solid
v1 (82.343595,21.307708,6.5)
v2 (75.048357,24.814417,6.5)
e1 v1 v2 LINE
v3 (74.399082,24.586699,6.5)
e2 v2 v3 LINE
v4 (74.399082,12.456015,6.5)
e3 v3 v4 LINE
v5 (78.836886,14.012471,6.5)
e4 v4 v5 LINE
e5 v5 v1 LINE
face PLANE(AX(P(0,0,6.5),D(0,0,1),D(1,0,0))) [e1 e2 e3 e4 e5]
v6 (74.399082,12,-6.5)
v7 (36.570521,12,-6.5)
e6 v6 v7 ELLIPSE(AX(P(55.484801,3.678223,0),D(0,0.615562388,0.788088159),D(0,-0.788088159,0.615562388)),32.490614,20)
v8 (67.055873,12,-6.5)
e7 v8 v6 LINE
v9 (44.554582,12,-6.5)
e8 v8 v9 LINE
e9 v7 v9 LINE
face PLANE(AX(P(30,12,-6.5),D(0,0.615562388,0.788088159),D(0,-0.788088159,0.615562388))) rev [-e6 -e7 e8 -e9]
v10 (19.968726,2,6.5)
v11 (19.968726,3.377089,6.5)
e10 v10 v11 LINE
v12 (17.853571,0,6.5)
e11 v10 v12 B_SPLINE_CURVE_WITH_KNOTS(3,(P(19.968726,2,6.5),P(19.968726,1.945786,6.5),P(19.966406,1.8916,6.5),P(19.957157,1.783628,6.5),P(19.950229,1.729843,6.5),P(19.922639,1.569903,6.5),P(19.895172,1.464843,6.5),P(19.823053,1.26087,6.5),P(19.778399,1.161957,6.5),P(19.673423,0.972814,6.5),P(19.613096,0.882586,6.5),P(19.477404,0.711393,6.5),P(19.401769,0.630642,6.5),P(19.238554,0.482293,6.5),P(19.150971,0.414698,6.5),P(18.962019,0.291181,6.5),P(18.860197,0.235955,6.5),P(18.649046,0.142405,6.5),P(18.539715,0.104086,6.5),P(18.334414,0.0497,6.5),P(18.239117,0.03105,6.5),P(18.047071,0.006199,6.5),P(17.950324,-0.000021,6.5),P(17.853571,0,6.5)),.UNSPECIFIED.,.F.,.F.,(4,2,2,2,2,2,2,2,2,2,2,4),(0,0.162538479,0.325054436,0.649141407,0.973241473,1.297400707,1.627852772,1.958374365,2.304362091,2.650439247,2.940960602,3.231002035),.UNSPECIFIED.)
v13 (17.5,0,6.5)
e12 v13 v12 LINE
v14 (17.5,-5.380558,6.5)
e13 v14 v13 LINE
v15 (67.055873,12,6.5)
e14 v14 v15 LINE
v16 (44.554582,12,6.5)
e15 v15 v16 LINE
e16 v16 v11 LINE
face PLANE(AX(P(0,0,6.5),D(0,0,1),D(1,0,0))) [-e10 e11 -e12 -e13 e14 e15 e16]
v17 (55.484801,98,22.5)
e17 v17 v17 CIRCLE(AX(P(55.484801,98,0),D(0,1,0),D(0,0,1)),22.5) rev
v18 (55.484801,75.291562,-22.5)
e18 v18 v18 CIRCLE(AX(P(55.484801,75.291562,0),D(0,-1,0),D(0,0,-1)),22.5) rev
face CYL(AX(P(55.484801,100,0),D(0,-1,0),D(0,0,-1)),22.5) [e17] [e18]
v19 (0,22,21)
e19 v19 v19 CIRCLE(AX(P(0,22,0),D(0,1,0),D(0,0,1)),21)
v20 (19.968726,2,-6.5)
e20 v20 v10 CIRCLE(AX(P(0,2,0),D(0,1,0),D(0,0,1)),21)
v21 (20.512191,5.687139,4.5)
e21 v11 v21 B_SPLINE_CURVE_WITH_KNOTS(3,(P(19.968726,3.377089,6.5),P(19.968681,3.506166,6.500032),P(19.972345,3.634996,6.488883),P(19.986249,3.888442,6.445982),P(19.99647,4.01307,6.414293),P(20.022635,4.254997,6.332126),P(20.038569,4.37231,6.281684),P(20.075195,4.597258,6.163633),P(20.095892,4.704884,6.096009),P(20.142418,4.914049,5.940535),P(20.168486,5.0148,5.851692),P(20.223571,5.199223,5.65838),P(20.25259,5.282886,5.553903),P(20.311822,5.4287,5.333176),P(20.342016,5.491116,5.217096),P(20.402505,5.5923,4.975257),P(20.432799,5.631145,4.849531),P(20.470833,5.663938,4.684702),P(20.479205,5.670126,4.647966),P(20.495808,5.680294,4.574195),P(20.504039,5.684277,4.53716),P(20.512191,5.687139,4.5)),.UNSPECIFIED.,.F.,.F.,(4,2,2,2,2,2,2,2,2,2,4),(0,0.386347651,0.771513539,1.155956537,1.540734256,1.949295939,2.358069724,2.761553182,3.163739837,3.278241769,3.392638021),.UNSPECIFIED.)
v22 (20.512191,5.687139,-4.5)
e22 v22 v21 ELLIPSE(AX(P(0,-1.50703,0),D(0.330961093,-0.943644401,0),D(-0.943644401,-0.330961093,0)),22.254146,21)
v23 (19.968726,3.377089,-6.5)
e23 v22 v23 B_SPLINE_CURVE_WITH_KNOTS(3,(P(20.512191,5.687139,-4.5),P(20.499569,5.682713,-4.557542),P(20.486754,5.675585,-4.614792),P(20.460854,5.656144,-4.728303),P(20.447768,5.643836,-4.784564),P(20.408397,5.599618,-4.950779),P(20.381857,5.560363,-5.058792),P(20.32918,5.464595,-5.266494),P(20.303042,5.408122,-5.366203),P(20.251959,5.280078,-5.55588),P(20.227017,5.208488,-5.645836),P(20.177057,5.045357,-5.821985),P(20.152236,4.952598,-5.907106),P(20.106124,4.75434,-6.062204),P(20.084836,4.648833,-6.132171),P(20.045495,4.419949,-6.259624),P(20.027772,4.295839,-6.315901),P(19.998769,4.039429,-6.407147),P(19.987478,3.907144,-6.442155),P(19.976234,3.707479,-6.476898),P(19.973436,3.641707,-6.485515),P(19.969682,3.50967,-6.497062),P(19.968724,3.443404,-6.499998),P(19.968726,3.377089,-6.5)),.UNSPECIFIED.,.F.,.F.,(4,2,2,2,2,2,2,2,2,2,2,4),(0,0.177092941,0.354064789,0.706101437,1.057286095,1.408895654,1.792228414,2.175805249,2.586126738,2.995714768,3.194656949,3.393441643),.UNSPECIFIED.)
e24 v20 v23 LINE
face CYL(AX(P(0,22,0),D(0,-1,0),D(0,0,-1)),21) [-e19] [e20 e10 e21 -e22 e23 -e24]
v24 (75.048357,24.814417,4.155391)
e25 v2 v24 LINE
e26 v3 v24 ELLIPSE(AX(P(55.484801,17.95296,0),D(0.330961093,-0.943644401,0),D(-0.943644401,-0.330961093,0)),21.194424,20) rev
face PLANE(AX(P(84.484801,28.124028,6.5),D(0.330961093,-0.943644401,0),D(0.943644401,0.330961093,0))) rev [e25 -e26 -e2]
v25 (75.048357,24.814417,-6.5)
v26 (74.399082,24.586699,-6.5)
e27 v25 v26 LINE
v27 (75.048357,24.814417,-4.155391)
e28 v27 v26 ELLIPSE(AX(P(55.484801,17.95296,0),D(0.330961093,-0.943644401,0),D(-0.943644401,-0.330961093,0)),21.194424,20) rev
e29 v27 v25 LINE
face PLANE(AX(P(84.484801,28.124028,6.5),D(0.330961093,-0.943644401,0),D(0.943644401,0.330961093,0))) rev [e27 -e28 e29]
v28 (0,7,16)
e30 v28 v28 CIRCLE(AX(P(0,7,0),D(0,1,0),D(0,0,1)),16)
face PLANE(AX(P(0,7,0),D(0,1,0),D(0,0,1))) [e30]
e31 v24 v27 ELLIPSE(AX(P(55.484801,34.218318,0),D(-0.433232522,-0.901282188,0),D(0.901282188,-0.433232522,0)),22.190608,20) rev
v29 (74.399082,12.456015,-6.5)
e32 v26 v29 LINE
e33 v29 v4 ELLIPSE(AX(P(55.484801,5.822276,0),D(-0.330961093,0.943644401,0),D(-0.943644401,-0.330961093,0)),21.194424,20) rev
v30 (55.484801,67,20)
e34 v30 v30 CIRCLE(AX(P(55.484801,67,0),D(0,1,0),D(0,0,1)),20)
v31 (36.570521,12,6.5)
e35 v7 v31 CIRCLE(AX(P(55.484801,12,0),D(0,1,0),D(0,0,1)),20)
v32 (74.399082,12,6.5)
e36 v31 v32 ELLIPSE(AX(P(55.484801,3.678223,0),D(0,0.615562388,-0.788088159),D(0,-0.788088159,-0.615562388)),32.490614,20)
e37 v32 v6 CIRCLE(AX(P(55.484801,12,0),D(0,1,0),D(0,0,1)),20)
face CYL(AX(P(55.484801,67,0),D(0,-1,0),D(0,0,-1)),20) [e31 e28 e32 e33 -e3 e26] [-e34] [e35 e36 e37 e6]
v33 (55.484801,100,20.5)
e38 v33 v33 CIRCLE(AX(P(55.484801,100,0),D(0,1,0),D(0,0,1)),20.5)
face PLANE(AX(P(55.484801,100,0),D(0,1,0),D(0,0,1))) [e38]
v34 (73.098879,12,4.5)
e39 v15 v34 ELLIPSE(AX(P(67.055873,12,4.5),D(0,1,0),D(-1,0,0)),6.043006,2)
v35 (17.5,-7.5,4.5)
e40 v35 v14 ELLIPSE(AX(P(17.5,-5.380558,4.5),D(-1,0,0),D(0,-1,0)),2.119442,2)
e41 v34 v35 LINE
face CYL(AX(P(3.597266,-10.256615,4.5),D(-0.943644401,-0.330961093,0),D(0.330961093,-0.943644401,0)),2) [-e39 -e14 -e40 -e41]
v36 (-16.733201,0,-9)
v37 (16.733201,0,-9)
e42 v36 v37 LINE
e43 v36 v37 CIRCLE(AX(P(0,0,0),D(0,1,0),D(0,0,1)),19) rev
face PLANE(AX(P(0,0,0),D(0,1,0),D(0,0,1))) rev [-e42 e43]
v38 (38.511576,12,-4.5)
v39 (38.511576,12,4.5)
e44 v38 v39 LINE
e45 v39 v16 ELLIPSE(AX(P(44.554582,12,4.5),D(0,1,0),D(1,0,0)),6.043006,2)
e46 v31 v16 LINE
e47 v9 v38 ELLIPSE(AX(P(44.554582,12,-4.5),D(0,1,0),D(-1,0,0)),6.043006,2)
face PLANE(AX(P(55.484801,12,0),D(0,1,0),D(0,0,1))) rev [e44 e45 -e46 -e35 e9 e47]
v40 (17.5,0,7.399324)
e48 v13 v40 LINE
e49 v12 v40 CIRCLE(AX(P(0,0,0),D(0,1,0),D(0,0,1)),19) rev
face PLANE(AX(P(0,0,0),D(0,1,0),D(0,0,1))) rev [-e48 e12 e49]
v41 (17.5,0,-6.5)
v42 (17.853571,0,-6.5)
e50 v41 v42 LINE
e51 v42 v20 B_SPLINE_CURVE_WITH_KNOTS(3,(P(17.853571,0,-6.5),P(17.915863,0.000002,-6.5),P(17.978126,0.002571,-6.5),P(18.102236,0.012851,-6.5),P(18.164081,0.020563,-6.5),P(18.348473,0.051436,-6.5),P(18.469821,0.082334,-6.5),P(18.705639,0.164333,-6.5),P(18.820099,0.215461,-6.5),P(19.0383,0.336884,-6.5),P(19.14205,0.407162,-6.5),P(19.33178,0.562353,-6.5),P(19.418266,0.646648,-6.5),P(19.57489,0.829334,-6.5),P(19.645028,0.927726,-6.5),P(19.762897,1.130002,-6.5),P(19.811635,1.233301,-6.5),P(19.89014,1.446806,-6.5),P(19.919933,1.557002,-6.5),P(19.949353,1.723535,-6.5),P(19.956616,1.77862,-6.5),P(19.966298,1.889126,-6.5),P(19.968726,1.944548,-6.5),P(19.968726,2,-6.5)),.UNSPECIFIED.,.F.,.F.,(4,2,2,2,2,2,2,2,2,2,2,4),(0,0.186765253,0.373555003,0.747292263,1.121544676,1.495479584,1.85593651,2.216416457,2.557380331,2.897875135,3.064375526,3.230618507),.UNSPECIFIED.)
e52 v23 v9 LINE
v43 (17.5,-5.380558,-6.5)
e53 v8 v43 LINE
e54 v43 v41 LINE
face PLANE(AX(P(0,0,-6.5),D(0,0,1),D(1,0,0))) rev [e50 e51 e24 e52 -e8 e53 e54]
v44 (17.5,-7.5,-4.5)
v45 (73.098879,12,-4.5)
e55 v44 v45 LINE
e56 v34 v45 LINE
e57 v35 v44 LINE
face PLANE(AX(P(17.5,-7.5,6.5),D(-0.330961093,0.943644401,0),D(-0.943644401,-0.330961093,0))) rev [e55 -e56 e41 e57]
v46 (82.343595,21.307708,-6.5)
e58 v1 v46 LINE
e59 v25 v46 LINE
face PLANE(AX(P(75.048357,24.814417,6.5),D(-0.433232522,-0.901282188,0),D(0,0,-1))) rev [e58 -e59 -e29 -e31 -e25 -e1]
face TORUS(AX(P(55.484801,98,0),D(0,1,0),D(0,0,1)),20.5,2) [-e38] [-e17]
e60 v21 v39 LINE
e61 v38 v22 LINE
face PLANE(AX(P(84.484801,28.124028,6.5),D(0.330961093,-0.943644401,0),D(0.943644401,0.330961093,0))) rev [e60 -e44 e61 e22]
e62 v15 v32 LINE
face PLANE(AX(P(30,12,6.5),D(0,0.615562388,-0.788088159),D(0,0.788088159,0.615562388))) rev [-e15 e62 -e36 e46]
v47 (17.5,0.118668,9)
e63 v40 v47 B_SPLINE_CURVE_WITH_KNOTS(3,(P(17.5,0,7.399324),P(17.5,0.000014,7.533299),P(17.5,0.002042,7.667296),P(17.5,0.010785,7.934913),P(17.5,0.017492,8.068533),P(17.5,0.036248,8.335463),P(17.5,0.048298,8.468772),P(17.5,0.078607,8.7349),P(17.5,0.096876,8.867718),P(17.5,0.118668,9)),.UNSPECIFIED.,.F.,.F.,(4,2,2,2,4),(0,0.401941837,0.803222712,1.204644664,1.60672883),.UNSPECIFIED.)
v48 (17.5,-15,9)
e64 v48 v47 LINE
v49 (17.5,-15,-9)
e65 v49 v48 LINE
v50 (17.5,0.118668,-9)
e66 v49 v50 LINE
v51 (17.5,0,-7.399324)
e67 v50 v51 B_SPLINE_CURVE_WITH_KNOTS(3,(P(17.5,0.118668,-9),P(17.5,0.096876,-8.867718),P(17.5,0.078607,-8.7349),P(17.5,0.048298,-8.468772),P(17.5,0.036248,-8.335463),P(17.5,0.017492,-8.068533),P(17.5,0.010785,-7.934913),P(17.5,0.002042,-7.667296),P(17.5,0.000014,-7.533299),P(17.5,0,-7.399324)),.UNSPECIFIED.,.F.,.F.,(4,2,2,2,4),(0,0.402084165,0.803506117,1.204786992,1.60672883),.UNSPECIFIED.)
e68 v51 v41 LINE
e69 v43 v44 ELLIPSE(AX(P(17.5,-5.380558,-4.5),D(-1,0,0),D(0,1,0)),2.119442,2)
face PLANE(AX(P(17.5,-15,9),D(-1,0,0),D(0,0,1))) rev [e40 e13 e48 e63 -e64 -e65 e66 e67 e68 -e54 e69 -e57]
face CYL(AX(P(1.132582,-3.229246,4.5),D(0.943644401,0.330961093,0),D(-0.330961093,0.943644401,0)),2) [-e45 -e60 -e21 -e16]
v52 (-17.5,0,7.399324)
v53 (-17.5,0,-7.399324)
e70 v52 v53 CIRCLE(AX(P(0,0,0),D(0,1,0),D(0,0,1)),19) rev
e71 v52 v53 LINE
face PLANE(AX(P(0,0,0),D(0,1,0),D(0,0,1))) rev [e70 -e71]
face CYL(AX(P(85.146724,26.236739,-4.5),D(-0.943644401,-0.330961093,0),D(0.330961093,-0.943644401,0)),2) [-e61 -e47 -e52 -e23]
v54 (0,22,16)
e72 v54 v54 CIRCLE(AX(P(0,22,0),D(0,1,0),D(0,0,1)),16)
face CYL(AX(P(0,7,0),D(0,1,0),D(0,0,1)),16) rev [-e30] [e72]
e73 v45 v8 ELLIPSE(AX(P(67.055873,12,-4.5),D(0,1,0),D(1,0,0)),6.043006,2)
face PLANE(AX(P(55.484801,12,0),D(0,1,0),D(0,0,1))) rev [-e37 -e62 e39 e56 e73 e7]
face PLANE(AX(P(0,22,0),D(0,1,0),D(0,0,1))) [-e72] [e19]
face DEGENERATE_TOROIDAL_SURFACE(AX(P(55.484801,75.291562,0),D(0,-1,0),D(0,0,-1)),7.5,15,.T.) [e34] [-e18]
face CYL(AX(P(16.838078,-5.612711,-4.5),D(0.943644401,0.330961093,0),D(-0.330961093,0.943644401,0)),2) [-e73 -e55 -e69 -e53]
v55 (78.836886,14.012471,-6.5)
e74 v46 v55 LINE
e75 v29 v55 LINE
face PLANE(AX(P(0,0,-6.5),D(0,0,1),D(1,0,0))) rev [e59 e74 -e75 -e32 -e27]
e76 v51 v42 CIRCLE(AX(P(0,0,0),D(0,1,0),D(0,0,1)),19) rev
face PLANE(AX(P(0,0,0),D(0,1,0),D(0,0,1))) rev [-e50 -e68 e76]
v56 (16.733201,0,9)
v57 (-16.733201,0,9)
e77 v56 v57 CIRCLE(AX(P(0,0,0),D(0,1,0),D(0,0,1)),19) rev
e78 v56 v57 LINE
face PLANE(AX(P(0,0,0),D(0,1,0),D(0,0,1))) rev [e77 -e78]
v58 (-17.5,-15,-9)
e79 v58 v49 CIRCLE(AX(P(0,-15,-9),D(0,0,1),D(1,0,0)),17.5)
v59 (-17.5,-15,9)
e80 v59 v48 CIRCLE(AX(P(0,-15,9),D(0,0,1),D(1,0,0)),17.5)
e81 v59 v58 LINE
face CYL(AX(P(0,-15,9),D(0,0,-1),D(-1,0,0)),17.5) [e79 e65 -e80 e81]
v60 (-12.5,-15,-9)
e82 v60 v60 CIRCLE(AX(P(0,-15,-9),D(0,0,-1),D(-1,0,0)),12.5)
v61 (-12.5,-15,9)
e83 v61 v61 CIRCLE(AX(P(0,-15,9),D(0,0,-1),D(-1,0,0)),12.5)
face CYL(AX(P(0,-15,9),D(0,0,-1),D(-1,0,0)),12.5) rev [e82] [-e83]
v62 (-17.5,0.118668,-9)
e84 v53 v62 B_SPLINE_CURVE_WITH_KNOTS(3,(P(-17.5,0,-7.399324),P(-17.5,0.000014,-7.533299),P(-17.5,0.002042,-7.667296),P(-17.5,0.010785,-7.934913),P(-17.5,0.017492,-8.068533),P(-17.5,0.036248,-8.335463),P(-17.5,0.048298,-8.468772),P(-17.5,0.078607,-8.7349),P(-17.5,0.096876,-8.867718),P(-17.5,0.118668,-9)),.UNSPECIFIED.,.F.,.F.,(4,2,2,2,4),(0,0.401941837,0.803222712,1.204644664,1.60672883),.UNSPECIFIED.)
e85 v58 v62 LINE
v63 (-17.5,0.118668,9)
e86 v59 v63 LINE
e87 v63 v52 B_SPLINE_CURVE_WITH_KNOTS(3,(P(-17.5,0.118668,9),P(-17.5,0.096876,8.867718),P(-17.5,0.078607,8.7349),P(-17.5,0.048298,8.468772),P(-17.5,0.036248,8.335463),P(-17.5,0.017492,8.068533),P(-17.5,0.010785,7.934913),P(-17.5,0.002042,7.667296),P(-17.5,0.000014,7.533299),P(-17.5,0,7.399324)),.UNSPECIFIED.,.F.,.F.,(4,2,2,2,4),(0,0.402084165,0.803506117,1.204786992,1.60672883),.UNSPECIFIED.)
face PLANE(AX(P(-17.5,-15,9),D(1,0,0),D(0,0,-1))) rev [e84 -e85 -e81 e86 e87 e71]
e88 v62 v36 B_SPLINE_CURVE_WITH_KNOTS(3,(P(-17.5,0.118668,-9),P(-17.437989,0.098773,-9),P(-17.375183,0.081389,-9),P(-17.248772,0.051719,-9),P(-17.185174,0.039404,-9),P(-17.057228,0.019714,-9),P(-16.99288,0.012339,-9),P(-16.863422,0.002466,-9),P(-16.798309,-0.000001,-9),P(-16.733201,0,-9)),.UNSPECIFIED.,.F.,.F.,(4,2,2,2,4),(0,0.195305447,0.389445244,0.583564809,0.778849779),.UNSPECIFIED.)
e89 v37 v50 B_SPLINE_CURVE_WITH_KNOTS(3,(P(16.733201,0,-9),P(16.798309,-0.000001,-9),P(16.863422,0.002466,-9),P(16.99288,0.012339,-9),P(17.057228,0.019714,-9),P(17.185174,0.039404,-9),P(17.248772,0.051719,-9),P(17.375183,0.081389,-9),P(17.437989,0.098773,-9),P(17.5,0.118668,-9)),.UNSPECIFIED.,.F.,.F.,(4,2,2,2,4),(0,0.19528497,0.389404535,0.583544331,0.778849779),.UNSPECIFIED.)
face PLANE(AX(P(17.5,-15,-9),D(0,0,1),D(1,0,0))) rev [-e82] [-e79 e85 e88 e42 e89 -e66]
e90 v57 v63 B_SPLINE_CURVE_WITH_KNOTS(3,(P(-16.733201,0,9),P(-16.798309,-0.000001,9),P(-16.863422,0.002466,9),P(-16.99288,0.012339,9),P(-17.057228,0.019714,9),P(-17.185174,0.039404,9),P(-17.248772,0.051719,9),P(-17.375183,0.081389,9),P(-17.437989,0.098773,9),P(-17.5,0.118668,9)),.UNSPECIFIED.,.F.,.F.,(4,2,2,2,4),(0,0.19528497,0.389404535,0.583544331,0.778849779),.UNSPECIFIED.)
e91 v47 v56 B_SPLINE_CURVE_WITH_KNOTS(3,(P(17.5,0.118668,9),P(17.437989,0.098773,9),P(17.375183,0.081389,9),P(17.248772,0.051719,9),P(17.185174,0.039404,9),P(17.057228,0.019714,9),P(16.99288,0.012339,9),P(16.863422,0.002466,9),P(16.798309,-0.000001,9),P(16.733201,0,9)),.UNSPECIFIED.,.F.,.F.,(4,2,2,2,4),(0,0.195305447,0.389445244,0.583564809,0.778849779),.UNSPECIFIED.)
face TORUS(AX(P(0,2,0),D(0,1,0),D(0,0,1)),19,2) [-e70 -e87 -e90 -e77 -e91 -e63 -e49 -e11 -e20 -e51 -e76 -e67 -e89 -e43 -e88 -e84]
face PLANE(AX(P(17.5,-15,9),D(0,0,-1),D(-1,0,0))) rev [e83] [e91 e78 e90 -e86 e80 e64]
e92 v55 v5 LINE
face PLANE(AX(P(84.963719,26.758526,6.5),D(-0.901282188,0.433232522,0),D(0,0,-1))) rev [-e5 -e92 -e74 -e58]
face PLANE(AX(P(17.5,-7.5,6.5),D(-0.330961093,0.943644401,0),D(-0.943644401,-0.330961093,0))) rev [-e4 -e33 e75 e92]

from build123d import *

# Parameters (mm, degrees)
SKETCH1_R           = 21
BOSS_EXTRUDE1_DEPTH = 22
SKETCH3_W           = 35
SKETCH3_H           = 18
BOSS_EXTRUDE2_DEPTH = 15
BOSS_EXTRUDE3_DEPTH = 9
SKETCH6_R           = 12.5
CUT_EXTRUDE1_DEPTH  = 18
BOSS_EXTRUDE5_DEPTH = 6.5
SKETCH9_R           = 20
BOSS_EXTRUDE6_DEPTH = 55
SKETCH10_R          = 22.5
BOSS_EXTRUDE7_DEPTH = 33
FILLET1_R           = 15
CHAMFER2_SIZE       = 10
FILLET3_R           = 2
FILLET4_R           = 2
FILLET5_R           = 2
CUT_EXTRUDE4_DEPTH  = 25
SKETCH13_R          = 16
CUT_EXTRUDE6_DEPTH  = 15


with BuildPart() as part:
    # Sketch1 → Boss-Extrude1 (new body)
    with BuildSketch(Plane(origin=(0, 0, 0), x_dir=(1, 0, 0), z_dir=(0, 1, 0))):
        with Locations(Location((0, 0, 0), (0, 0, 270))):
            Circle(SKETCH1_R)
    extrude(amount=BOSS_EXTRUDE1_DEPTH)

    # Sketch3 → Boss-Extrude2 (add)
    with BuildSketch(Plane.XZ):
        Rectangle(SKETCH3_W, SKETCH3_H)
    extrude(amount=BOSS_EXTRUDE2_DEPTH)

    # Sketch5 → Boss-Extrude3 (add, symmetric)
    with BuildSketch(Plane.XY):
        with BuildLine():
            Line((-17.5, -15), (17.5, -15))
            ThreePointArc((17.5, -15), (0, -32.5), (-17.5, -15))
        make_face()
    extrude(amount=BOSS_EXTRUDE3_DEPTH, both=True)

    # Sketch6 → Cut-Extrude1 (cut)
    with BuildSketch(Plane(origin=(0, 0, -9), x_dir=(-1, 0, 0), z_dir=(0, 0, -1))):
        with Locations((0, -15)):
            Circle(SKETCH6_R)
    extrude(amount=-CUT_EXTRUDE1_DEPTH, mode=Mode.SUBTRACT)

    # Sketch7 → Boss-Extrude5 (add, symmetric)
    with BuildSketch(Plane.XY):
        Polygon((17.5, -7.5), (88.273330058, 17.322081953), (84.484801337, 28.124028145), (17.5, 4.63068359), align=None)
    extrude(amount=BOSS_EXTRUDE5_DEPTH, both=True)

    # Sketch9 → Boss-Extrude6 (add)
    with BuildSketch(Plane(origin=(0, 12, 0), x_dir=(1, 0, 0), z_dir=(0, 1, 0))):
        with Locations(Location((55.484801337, 0, 0), (0, 0, 270))):
            Circle(SKETCH9_R)
    extrude(amount=BOSS_EXTRUDE6_DEPTH)

    # Sketch10 → Boss-Extrude7 (add)
    with BuildSketch(Plane(origin=(0, 67, 0), x_dir=(1, 0, 0), z_dir=(0, 1, 0))):
        with Locations(Location((55.484801337, 0, 0), (0, 0, 270))):
            Circle(SKETCH10_R)
    extrude(amount=BOSS_EXTRUDE7_DEPTH)

    # Fillet1
    # the kernel refuses this fillet: 15 mm, written as the material it takes off along each edge
    with BuildSketch(Plane(origin=(55.484801337, 67, 0), x_dir=(0, 0, 1), z_dir=(-1, 0, 0))) as fillet1_piece_1:
        with BuildLine():
            CenterArc((7.5, 8.291561976), FILLET1_R, 326.442690238, 33.557309762)
            Line((20, 0), (20.25, -0.16583124))
            ThreePointArc((20.25, -0.16583124), (21.25, -0.3), (22.5, -0.3))
            Line((22.5, -0.3), (22.8, 0))
            Line((22.8, 0), (22.8, 8.291561976))
            Line((22.8, 8.291561976), (22.5, 8.291561976))
        make_face()
    revolve(axis=Axis((55.484801337, 67, 0), (0, 1, 0)), mode=Mode.SUBTRACT)

    # Chamfer2
    # the kernel refuses this chamfer: 10 mm, written as the material it takes off along each edge
    with BuildSketch(Plane(origin=(84.484801337, 28.124028145, -32.21682988), x_dir=(-0.9523876901556013, -0.30488963189993584, 0), z_dir=(0, 0, 1))) as chamfer2_piece_1_section:
        Polygon((CHAMFER2_SIZE * 0.999621916911, CHAMFER2_SIZE * 0.0274958766106), (-CHAMFER2_SIZE * 0.0274958766106, CHAMFER2_SIZE * 0.999621916911), (0, 0), align=None)
    chamfer2_piece_1 = extrude(amount=64.433659759, mode=Mode.PRIVATE)
    chamfer2_piece_1 = chamfer2_piece_1 - Plane(origin=(55.484801337, 23.91959175, 0), x_dir=(0, 0, 1), z_dir=(0, -1, 0)) * Cylinder(20, 169, mode=Mode.PRIVATE)
    add(chamfer2_piece_1, mode=Mode.SUBTRACT)
    with BuildSketch(Plane(origin=(88.273330058, 17.322081953, -32.21682988), x_dir=(-0.9341875594200248, -0.3567822919160335, 0), z_dir=(0, 0, 1))) as chamfer2_piece_2:
        Polygon((CHAMFER2_SIZE * 0.999621916911, -CHAMFER2_SIZE * 0.0274958766106), (-CHAMFER2_SIZE * 0.0274958766106, -CHAMFER2_SIZE * 0.999621916911), (0, 0), align=None)
    extrude(amount=64.433659759, mode=Mode.SUBTRACT)

    # Fillet3
    fillet3_edges = [part.edges().sort_by_distance(p)[0] for p in [
        (45.299439603, 2.25, -6.5),
        (29.240150797, 8.748265524, -6.5),
        (29.240150797, 8.748265524, 6.5),
        (45.299439603, 2.25, 6.5),
    ]]
    fillet(fillet3_edges, radius=FILLET3_R)

    # Fillet4
    # the kernel refuses this fillet: 2 mm, written as the material it takes off along each edge
    with BuildSketch(Plane(origin=(0, 0, 0), x_dir=(0.9971250818764672, 0, -0.07577315548958338), z_dir=(0.07577315548958338, 0, 0.9971250818764672))) as fillet4_piece_1_section:
        with BuildLine():
            CenterArc((21 - FILLET4_R, FILLET4_R), FILLET4_R, 270, 90)
            Line((21 - FILLET4_R, 0), (21, 0))
            Line((21, 0), (21, FILLET4_R))
        make_face()
    fillet4_piece_1 = revolve(axis=Axis((0, 0, 0), (0, 1, 0)), revolution_arc=265.654352731, mode=Mode.PRIVATE)
    fillet4_piece_1 = split(fillet4_piece_1, bisect_by=Plane(origin=(19.021746519, 0.448100529, -6.5), z_dir=(0, 0, -1)), keep=Keep.TOP, mode=Mode.PRIVATE)
    fillet4_piece_1 = split(fillet4_piece_1, bisect_by=Plane(origin=(17.5, 0.448100529, -7.756660991), z_dir=(1, 0, 0)), keep=Keep.TOP, mode=Mode.PRIVATE)
    add(fillet4_piece_1, mode=Mode.SUBTRACT)
    with BuildSketch(Plane(origin=(0, 0, 0), x_dir=(0.9971250818764672, 0, -0.07577315548958338), z_dir=(0.07577315548958338, 0, 0.9971250818764672))) as fillet4_piece_2_section:
        with BuildLine():
            CenterArc((21 - FILLET4_R, FILLET4_R), FILLET4_R, 270, 90)
            Line((21 - FILLET4_R, 0), (21, 0))
            Line((21, 0), (21, FILLET4_R))
        make_face()
    fillet4_piece_2 = revolve(axis=Axis((0, 0, 0), (0, 1, 0)), revolution_arc=265.654352731, mode=Mode.PRIVATE)
    fillet4_piece_2 = split(fillet4_piece_2, bisect_by=Plane(origin=(0, 0.562448444, -9), z_dir=(0, 0, -1)), keep=Keep.TOP, mode=Mode.PRIVATE)
    add(fillet4_piece_2, mode=Mode.SUBTRACT)
    with BuildSketch(Plane(origin=(0, 0, 0), x_dir=(0.9971250818764672, 0, -0.07577315548958338), z_dir=(0.07577315548958338, 0, 0.9971250818764672))) as fillet4_piece_3_section:
        with BuildLine():
            CenterArc((21 - FILLET4_R, FILLET4_R), FILLET4_R, 270, 90)
            Line((21 - FILLET4_R, 0), (21, 0))
            Line((21, 0), (21, FILLET4_R))
        make_face()
    fillet4_piece_3 = revolve(axis=Axis((0, 0, 0), (0, 1, 0)), revolution_arc=265.654352731, mode=Mode.PRIVATE)
    fillet4_piece_3 = split(fillet4_piece_3, bisect_by=Plane(origin=(-17.5, 0.448099897, -7.756661101), z_dir=(-1, 0, 0)), keep=Keep.TOP, mode=Mode.PRIVATE)
    add(fillet4_piece_3, mode=Mode.SUBTRACT)
    with BuildSketch(Plane(origin=(0, 0, 0), x_dir=(0.9971250818764672, 0, -0.07577315548958338), z_dir=(0.07577315548958338, 0, 0.9971250818764672))) as fillet4_piece_4_section:
        with BuildLine():
            CenterArc((21 - FILLET4_R, FILLET4_R), FILLET4_R, 270, 90)
            Line((21 - FILLET4_R, 0), (21, 0))
            Line((21, 0), (21, FILLET4_R))
        make_face()
    fillet4_piece_4 = revolve(axis=Axis((0, 0, 0), (0, 1, 0)), revolution_arc=265.654352731, mode=Mode.PRIVATE)
    fillet4_piece_4 = split(fillet4_piece_4, bisect_by=Plane(origin=(-10.643200487, 0.567263166, 9), z_dir=(0, 0, 1)), keep=Keep.TOP, mode=Mode.PRIVATE)
    add(fillet4_piece_4, mode=Mode.SUBTRACT)
    with BuildSketch(Plane(origin=(0, 0, 0), x_dir=(0, 0, 1), z_dir=(-1, 0, 0))) as fillet4_piece_5_section:
        with BuildLine():
            CenterArc((21 - FILLET4_R, FILLET4_R), FILLET4_R, 270, 90)
            Line((21 - FILLET4_R, 0), (21, 0))
            Line((21, 0), (21, FILLET4_R))
        make_face()
    fillet4_piece_5 = revolve(axis=Axis((0, 0, 0), (0, 1, 0)), revolution_arc=85.61482077, mode=Mode.PRIVATE)
    fillet4_piece_5 = split(fillet4_piece_5, bisect_by=Plane(origin=(10.643200508, 0.567263125, 9), z_dir=(0, 0, 1)), keep=Keep.TOP, mode=Mode.PRIVATE)
    add(fillet4_piece_5, mode=Mode.SUBTRACT)
    with BuildSketch(Plane(origin=(0, 0, 0), x_dir=(0, 0, 1), z_dir=(-1, 0, 0))) as fillet4_piece_6_section:
        with BuildLine():
            CenterArc((21 - FILLET4_R, FILLET4_R), FILLET4_R, 270, 90)
            Line((21 - FILLET4_R, 0), (21, 0))
            Line((21, 0), (21, FILLET4_R))
        make_face()
    fillet4_piece_6 = revolve(axis=Axis((0, 0, 0), (0, 1, 0)), revolution_arc=85.61482077, mode=Mode.PRIVATE)
    fillet4_piece_6 = split(fillet4_piece_6, bisect_by=Plane(origin=(19.021746751, 0.448100278, 6.5), z_dir=(0, 0, 1)), keep=Keep.TOP, mode=Mode.PRIVATE)
    fillet4_piece_6 = split(fillet4_piece_6, bisect_by=Plane(origin=(17.5, 0.448100278, 7.756660688), z_dir=(1, 0, 0)), keep=Keep.TOP, mode=Mode.PRIVATE)
    add(fillet4_piece_6, mode=Mode.SUBTRACT)

    # Fillet5
    fillet5_edges = [part.edges().sort_by_distance(p)[0] for p in [
        (55.484801337, 100, -22.5),
    ]]
    fillet(fillet5_edges, radius=FILLET5_R)

    # Sketch12 → Cut-Extrude4 (cut, symmetric)
    with BuildSketch(Plane(origin=(55, 0, 0), x_dir=(0, 0, -1), z_dir=(1, 0, 0))):
        Polygon((6.5, 12), (20, 29.283691076), (20, 12), align=None)
        Polygon((-20, 12), (-6.5, 12), (-20, 29.283691076), align=None)
    extrude(amount=CUT_EXTRUDE4_DEPTH, both=True, mode=Mode.SUBTRACT)

    # Sketch13 → Cut-Extrude6 (cut)
    with BuildSketch(Plane(origin=(0, 22, 0), x_dir=(1, 0, 0), z_dir=(0, 1, 0))):
        with Locations(Location((0, 0, 0), (0, 0, 270))):
            Circle(SKETCH13_R)
    extrude(amount=-CUT_EXTRUDE6_DEPTH, mode=Mode.SUBTRACT)


solid = part.part
